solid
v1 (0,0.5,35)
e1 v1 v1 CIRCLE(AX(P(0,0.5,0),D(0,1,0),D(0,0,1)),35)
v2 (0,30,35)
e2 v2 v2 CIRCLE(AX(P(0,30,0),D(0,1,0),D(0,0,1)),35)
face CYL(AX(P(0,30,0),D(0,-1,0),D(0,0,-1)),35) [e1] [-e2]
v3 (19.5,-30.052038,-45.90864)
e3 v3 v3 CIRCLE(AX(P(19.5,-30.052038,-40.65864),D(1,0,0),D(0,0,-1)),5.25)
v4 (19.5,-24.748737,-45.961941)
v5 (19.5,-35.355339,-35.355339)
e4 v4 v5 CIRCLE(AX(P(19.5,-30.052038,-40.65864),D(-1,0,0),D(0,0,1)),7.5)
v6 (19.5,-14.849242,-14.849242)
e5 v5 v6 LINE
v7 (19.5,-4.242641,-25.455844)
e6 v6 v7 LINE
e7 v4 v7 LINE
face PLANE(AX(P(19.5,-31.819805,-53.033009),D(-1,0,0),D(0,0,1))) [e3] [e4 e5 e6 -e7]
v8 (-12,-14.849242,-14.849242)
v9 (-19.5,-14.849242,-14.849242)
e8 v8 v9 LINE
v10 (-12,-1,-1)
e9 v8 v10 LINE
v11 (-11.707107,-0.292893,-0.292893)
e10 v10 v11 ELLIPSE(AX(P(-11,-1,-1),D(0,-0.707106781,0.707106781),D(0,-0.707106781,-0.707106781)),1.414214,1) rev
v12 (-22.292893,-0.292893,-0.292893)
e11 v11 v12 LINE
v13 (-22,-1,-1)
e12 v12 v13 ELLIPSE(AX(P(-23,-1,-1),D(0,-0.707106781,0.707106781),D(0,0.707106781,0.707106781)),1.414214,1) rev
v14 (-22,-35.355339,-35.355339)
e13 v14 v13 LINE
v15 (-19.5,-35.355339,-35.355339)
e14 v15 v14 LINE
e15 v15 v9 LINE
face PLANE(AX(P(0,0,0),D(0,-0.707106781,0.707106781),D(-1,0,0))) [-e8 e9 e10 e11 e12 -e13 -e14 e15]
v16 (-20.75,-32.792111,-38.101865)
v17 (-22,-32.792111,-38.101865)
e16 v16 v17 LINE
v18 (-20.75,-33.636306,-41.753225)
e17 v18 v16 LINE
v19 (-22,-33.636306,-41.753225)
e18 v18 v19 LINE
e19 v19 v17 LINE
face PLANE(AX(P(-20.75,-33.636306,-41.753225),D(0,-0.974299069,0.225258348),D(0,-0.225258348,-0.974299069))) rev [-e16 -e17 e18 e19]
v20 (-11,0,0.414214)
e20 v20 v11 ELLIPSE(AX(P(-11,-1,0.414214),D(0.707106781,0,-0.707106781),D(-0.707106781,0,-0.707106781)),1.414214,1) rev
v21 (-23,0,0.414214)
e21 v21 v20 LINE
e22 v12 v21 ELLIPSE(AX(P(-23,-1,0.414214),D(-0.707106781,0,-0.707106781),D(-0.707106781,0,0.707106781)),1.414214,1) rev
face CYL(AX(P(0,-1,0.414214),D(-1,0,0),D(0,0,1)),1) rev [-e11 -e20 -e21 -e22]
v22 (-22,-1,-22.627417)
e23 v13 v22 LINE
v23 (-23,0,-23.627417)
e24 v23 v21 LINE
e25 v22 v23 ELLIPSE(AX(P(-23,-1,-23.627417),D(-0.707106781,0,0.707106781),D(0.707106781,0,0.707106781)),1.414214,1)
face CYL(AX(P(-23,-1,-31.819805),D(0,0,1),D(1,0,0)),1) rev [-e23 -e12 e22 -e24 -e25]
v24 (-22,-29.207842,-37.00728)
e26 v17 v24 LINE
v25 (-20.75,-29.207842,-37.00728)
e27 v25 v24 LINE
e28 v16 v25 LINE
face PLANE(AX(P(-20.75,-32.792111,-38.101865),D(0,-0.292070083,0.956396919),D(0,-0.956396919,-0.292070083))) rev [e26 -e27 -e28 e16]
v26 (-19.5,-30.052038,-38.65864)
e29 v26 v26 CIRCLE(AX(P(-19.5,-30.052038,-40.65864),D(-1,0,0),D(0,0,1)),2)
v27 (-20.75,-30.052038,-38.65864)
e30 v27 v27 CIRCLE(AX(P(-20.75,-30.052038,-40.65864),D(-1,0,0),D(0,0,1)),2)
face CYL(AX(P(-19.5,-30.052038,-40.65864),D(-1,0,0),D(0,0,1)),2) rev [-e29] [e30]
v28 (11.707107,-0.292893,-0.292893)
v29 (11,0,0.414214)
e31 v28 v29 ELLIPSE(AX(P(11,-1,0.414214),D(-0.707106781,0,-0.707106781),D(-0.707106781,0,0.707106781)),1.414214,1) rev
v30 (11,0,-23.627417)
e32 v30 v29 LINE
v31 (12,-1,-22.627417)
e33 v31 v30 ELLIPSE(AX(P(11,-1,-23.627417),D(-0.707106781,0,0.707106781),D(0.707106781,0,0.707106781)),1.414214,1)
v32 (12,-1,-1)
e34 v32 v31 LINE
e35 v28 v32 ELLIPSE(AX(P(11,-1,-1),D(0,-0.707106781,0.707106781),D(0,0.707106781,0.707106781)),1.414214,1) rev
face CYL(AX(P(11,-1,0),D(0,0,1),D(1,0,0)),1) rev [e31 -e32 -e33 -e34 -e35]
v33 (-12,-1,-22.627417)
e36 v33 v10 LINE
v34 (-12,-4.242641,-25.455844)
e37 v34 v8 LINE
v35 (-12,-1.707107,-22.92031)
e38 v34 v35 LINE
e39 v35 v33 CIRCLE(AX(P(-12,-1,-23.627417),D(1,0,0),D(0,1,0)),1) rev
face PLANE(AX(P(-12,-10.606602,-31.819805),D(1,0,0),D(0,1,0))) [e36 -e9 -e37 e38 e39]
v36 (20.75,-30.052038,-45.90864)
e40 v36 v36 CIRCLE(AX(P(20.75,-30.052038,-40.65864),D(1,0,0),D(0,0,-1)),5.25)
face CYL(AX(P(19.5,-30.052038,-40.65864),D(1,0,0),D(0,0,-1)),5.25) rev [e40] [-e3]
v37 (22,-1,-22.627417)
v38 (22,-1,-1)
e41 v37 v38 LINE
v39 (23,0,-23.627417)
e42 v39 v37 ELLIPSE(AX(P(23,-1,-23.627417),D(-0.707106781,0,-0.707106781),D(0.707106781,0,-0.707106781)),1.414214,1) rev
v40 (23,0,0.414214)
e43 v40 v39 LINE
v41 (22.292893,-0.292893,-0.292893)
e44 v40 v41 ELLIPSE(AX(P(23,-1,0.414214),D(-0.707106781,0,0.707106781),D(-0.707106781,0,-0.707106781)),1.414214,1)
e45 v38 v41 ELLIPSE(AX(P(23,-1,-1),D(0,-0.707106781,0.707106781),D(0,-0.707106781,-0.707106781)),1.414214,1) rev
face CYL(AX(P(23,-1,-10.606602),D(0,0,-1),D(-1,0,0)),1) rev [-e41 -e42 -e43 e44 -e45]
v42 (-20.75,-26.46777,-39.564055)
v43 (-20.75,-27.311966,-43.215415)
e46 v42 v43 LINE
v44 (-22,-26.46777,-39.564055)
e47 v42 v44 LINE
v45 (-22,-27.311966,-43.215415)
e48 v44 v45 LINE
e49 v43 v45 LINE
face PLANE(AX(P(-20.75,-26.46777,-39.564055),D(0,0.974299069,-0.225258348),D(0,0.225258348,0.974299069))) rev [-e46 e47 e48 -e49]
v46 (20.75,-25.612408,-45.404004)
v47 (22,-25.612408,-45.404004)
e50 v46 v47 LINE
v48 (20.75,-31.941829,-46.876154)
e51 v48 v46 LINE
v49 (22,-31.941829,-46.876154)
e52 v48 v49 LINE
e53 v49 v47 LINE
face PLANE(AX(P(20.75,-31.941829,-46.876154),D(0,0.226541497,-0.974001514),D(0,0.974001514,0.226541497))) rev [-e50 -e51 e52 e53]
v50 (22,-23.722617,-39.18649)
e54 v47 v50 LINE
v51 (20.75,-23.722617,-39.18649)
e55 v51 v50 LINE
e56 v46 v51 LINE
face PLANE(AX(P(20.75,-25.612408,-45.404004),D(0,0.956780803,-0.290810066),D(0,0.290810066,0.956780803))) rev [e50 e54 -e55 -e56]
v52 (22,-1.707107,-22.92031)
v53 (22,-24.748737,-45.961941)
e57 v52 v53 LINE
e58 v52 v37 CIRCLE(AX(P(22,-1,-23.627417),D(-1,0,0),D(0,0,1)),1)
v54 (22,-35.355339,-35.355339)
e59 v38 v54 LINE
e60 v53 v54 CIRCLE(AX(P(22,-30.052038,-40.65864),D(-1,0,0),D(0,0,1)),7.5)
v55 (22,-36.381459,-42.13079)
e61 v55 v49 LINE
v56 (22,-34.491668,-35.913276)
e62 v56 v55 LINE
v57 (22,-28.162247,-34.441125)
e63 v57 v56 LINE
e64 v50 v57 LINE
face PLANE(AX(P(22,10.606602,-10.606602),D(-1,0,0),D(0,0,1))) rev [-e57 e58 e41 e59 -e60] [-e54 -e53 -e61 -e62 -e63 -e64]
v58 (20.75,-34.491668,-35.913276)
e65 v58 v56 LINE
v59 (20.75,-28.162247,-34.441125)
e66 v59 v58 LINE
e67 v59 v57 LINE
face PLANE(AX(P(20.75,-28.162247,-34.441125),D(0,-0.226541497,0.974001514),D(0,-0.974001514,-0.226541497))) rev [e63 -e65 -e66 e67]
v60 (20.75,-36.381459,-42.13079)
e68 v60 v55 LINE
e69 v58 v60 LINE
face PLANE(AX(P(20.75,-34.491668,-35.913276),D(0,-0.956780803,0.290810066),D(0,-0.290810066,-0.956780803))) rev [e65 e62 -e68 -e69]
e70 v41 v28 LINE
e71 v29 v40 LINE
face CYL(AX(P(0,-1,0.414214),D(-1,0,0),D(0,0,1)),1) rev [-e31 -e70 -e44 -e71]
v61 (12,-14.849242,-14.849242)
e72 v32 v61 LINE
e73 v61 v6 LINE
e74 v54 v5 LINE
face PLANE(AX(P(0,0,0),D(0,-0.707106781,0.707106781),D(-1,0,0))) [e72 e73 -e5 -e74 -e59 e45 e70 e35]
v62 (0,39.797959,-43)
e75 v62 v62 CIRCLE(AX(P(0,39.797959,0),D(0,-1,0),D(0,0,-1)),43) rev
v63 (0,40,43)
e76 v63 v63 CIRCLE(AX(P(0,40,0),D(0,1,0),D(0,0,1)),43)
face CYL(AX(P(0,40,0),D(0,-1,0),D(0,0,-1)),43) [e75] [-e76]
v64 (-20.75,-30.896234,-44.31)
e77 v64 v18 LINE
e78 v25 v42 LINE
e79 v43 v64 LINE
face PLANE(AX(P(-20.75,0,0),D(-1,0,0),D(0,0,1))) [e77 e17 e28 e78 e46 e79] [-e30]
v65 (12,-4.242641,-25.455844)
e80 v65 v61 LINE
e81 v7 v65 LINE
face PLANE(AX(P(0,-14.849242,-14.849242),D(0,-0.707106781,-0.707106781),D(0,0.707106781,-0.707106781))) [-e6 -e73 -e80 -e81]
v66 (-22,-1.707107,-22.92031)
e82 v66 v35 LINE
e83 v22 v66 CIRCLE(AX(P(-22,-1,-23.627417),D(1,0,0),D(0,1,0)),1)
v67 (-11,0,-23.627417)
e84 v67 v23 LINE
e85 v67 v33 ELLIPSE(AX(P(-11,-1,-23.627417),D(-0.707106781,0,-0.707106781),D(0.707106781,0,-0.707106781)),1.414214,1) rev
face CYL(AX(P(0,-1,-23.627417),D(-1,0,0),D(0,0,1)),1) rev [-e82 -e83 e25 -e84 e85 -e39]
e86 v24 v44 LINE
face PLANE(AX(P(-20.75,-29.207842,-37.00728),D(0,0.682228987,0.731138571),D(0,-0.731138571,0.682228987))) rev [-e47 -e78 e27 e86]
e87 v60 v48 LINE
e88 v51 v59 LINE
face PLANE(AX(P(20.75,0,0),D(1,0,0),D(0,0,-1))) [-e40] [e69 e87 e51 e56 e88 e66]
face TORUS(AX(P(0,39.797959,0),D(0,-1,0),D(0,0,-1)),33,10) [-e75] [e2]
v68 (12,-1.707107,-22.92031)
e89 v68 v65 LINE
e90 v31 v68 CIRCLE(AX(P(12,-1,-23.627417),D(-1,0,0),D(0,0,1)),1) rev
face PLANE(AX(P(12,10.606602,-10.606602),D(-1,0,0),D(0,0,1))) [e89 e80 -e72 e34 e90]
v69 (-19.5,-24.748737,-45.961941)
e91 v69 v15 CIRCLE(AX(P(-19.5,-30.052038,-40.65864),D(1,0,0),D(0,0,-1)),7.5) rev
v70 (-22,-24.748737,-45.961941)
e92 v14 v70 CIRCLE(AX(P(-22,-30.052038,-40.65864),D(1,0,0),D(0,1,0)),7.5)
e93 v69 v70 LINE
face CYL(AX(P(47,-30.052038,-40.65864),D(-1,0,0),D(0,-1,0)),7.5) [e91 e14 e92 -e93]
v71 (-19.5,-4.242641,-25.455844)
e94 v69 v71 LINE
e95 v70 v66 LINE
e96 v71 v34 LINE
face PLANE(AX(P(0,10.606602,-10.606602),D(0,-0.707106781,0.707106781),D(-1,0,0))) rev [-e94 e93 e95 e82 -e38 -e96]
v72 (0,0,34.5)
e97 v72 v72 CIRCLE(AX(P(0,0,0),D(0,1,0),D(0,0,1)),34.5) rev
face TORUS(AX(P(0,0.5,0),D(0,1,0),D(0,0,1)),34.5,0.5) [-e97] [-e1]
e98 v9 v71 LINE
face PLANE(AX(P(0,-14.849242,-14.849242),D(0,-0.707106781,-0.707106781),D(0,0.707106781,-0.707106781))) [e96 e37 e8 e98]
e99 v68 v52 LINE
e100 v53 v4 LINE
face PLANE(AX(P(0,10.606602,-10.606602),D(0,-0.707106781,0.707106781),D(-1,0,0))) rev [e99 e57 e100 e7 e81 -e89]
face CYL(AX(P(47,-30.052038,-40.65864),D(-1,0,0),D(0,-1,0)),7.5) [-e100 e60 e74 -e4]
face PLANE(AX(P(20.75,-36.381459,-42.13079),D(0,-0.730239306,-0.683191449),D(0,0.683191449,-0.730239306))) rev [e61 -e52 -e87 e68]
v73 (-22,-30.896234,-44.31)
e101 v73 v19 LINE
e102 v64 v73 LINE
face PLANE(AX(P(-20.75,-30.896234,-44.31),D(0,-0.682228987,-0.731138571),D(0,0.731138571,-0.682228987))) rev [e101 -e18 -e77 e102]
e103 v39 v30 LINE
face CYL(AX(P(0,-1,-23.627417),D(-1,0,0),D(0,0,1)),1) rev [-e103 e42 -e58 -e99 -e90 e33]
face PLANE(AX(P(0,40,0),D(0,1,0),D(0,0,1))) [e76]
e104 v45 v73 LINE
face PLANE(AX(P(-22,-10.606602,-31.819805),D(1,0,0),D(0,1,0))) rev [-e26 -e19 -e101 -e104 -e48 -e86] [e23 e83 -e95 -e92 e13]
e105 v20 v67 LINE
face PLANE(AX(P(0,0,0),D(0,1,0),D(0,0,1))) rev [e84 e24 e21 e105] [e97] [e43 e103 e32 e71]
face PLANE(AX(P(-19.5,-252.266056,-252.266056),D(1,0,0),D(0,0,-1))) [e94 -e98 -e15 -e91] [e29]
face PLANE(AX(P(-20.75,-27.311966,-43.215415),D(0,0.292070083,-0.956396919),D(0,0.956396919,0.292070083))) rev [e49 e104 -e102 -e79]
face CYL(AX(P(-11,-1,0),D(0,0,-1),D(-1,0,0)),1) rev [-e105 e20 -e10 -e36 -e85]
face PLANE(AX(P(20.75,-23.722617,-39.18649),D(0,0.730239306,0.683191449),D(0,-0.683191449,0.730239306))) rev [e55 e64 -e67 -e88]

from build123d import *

# Parameters (mm, degrees)
SKETCH2_R                           = 35
BOSS_EXTRUDE2_DEPTH                 = 30
SKETCH4_R                           = 43
BOSS_EXTRUDE3_DEPTH                 = 10
FILLET2_R                           = 10
SKETCH6_W                           = 10
SKETCH6_H                           = 30
EXTRUDE_THIN2_DEPTH                 = 15
SKETCH10_W                          = 10
SKETCH10_H                          = 15
BOSS_EXTRUDE4_DEPTH                 = 30
SKETCH11_W                          = 10
SKETCH11_H                          = 15
BOSS_EXTRUDE5_DEPTH                 = 30
FILLET4_R                           = 1
FILLET5_R                           = 0.5
CUT_EXTRUDE1_DEPTH                  = 127.256815818
CUT_EXTRUDE1_DEPTH_BACK             = 39
SKETCH12_W                          = 7.5
SKETCH12_H                          = 15
CUT_EXTRUDE2_REACH                  = 96.008
SKETCH17_W                          = 7.5
SKETCH17_H                          = 15
CUT_EXTRUDE3_DEPTH                  = 29
CUT_EXTRUDE3_DIRECTION_2_REACH      = 118.906
CUT_EXTRUDE3_DIRECTION_2_END_RADIUS = 7.5
CUT_EXTRUDE4_DEPTH                  = 1.25
SKETCH20_R                          = 2
CUT_EXTRUDE5_DEPTH                  = 1.25
CUT_EXTRUDE7_DEPTH                  = 1.25
SKETCH22_R                          = 5.25
CUT_EXTRUDE8_DEPTH                  = 1.25


with BuildPart() as part:
    # Sketch2 → Boss-Extrude2 (new body)
    with BuildSketch(Plane(origin=(0, 0, 0), x_dir=(1, 0, 0), z_dir=(0, 1, 0))):
        with Locations(Location((0, 0, 0), (0, 0, 270))):
            Circle(SKETCH2_R)
    extrude(amount=BOSS_EXTRUDE2_DEPTH)

    # Sketch4 → Boss-Extrude3 (add)
    with BuildSketch(Plane(origin=(0, 30, 0), x_dir=(1, 0, 0), z_dir=(0, 1, 0))):
        with Locations(Location((0, 0, 0), (0, 0, 270))):
            Circle(SKETCH4_R)
    extrude(amount=BOSS_EXTRUDE3_DEPTH)

    # Fillet2
    # the kernel refuses this fillet: 10 mm, written as the material it takes off along each edge
    with BuildSketch(Plane(origin=(0, 30, 0), x_dir=(0, 0, 1), z_dir=(-1, 0, 0))) as fillet2_piece_1:
        with BuildLine():
            CenterArc((33, 9.797958971), FILLET2_R, 281.536959033, 78.463040967)
            Line((35, 0), (35.04, -0.195959179))
            ThreePointArc((35.04, -0.195959179), (39, -0.2), (43, -0.2))
            Line((43, -0.2), (43.2, 0))
            Line((43.2, 0), (43.2, 9.797958971))
            Line((43.2, 9.797958971), (43, 9.797958971))
        make_face()
    revolve(axis=Axis((0, 30, 0), (0, 1, 0)), mode=Mode.SUBTRACT)

    # Sketch6 → Extrude-Thin2 (add)
    with BuildSketch(Plane(origin=(0, 0, 0), x_dir=(1, 0, 0), z_dir=(0, 0.7071067811865464, -0.7071067811865488))):
        with Locations((17, 15)):
            Rectangle(SKETCH6_W, SKETCH6_H)
        with Locations((-17, 15)):
            Rectangle(SKETCH6_W, SKETCH6_H)
    extrude(amount=EXTRUDE_THIN2_DEPTH)

    # Sketch10 → Boss-Extrude4 (add)
    with BuildSketch(Plane(origin=(0, -21.213203436, -21.213203436), x_dir=(1, 0, 0), z_dir=(0, -0.7071067811865487, -0.7071067811865465))):
        with Locations((17, -7.5)):
            Rectangle(SKETCH10_W, SKETCH10_H)
    extrude(amount=BOSS_EXTRUDE4_DEPTH)

    # Sketch11 → Boss-Extrude5 (add)
    with BuildSketch(Plane(origin=(0, -21.213203436, -21.213203436), x_dir=(1, 0, 0), z_dir=(0, -0.7071067811865487, -0.7071067811865465))):
        with Locations((-17, -7.5)):
            Rectangle(SKETCH11_W, SKETCH11_H)
    extrude(amount=BOSS_EXTRUDE5_DEPTH)

    # Fillet4
    fillet4_edges = [part.edges().sort_by_distance(p)[0] for p in [
        (-12, 0, -10.606601718),
        (-17, 0, -21.213203436),
        (-22, 0, -10.606601718),
        (-17, 0, 0),
        (12, 0, -10.606601718),
        (22, 0, -10.606601718),
        (17, 0, -21.213203436),
        (17, 0, 0),
    ]]
    fillet(fillet4_edges, radius=FILLET4_R)

    # Fillet5
    fillet5_edges = [part.edges().sort_by_distance(p)[0] for p in [
        (0, 0, -35),
    ]]
    fillet(fillet5_edges, radius=FILLET5_R)

    # Sketch12 → Cut-Extrude1 (cut, two sides: drawn at the far end of the back side and taken through both)
    with BuildSketch(Plane(origin=(0, -42.426406871, -42.426406871), x_dir=(1, 0, 0), z_dir=(0, -0.7071067811865485, -0.7071067811865467)).offset(-CUT_EXTRUDE1_DEPTH_BACK)):
        with Locations((-15.75, -7.5)):
            Rectangle(SKETCH12_W, SKETCH12_H)
    extrude(amount=CUT_EXTRUDE1_DEPTH + CUT_EXTRUDE1_DEPTH_BACK, mode=Mode.SUBTRACT)

    # Sketch13 → Cut-Extrude2 (cut, up to next)
    with BuildSketch(Plane.ZY.offset(22), mode=Mode.PRIVATE) as cut_extrude2_sk1:
        with BuildLine():
            Line((-42.426406871, -42.426406871), (-53.033008589, -31.819805153))
            Line((-53.033008589, -31.819805153), (-45.961940777, -24.748737342))
            ThreePointArc((-45.961940777, -24.748737342), (-45.961940777, -35.355339059), (-35.355339059, -35.355339059))
            Line((-35.355339059, -35.355339059), (-42.426406871, -42.426406871))
        make_face()
    cut_extrude2_tool1 = extrude(cut_extrude2_sk1.sketch, amount=-CUT_EXTRUDE2_REACH, mode=Mode.PRIVATE) & part.part
    add(cut_extrude2_tool1.solids().sort_by_distance((-22, -35.429094, -46.035696))[0], mode=Mode.SUBTRACT)
    add(cut_extrude2_tool1.solids().sort_by_distance((-22, -35.429094, -46.035696))[1], mode=Mode.SUBTRACT)

    # Sketch17 → Cut-Extrude3 (cut)
    with BuildSketch(Plane(origin=(0, -35.355339059, -35.355339059), x_dir=(-1, 0, 0), z_dir=(0, -0.7071067811865487, -0.7071067811865465))):
        with Locations((-15.75, 7.5)):
            Rectangle(SKETCH17_W, SKETCH17_H)
    extrude(amount=-CUT_EXTRUDE3_DEPTH, mode=Mode.SUBTRACT)

    # Cut-Extrude3 direction 2: up to this cylinder (the profile starts inside it)
    cut_extrude3_direction_2_end = Plane(origin=(15.75, -30.0520382, -40.658639918), z_dir=(-1, 0, 0)) * Cylinder(CUT_EXTRUDE3_DIRECTION_2_END_RADIUS, 253.812, mode=Mode.PRIVATE)
    # Sketch17 → Cut-Extrude3 direction 2 (cut, up to the surface)
    with BuildSketch(Plane(origin=(0, -35.355339059, -35.355339059), x_dir=(-1, 0, 0), z_dir=(0, -0.7071067811865487, -0.7071067811865465)), mode=Mode.PRIVATE) as cut_extrude3_direction_2_sk1:
        with Locations((-15.75, 7.5)):
            Rectangle(SKETCH17_W, SKETCH17_H)
    cut_extrude3_direction_2_tool1 = extrude(cut_extrude3_direction_2_sk1.sketch, amount=CUT_EXTRUDE3_DIRECTION_2_REACH, mode=Mode.PRIVATE) & cut_extrude3_direction_2_end
    add(cut_extrude3_direction_2_tool1.solids().sort_by_distance((15.75, -30.052038, -40.65864))[0], mode=Mode.SUBTRACT)

    # Sketch18 → Cut-Extrude4 (cut)
    with BuildSketch(Plane.ZY.offset(22)):
        Polygon((-44.309999675, -30.896234088), (-41.753224712, -33.636306452), (-38.101864956, -32.792110564), (-37.007280162, -29.207842313), (-39.564055124, -26.467769949), (-43.215414881, -27.311965837), align=None)
    extrude(amount=-CUT_EXTRUDE4_DEPTH, mode=Mode.SUBTRACT)

    # Sketch20 → Cut-Extrude5 (cut)
    with BuildSketch(Plane.ZY.offset(20.75)):
        with Locations((-40.658639918, -30.0520382)):
            Circle(SKETCH20_R)
    extrude(amount=-CUT_EXTRUDE5_DEPTH, mode=Mode.SUBTRACT)

    # Sketch21 → Cut-Extrude7 (cut)
    with BuildSketch(Plane(origin=(22, 0, 0), x_dir=(0, 0, -1), z_dir=(1, 0, 0))):
        Polygon((34.441125497, -28.162247172), (35.913275669, -34.491668124), (42.130790091, -36.381459152), (46.876154339, -31.941829228), (45.404004167, -25.612408277), (39.186489746, -23.722617249), align=None)
    extrude(amount=-CUT_EXTRUDE7_DEPTH, mode=Mode.SUBTRACT)

    # Sketch22 → Cut-Extrude8 (cut)
    with BuildSketch(Plane(origin=(20.75, 0, 0), x_dir=(0, 0, -1), z_dir=(1, 0, 0))):
        with Locations((40.658639918, -30.0520382)):
            Circle(SKETCH22_R)
    extrude(amount=-CUT_EXTRUDE8_DEPTH, mode=Mode.SUBTRACT)


solid = part.part
